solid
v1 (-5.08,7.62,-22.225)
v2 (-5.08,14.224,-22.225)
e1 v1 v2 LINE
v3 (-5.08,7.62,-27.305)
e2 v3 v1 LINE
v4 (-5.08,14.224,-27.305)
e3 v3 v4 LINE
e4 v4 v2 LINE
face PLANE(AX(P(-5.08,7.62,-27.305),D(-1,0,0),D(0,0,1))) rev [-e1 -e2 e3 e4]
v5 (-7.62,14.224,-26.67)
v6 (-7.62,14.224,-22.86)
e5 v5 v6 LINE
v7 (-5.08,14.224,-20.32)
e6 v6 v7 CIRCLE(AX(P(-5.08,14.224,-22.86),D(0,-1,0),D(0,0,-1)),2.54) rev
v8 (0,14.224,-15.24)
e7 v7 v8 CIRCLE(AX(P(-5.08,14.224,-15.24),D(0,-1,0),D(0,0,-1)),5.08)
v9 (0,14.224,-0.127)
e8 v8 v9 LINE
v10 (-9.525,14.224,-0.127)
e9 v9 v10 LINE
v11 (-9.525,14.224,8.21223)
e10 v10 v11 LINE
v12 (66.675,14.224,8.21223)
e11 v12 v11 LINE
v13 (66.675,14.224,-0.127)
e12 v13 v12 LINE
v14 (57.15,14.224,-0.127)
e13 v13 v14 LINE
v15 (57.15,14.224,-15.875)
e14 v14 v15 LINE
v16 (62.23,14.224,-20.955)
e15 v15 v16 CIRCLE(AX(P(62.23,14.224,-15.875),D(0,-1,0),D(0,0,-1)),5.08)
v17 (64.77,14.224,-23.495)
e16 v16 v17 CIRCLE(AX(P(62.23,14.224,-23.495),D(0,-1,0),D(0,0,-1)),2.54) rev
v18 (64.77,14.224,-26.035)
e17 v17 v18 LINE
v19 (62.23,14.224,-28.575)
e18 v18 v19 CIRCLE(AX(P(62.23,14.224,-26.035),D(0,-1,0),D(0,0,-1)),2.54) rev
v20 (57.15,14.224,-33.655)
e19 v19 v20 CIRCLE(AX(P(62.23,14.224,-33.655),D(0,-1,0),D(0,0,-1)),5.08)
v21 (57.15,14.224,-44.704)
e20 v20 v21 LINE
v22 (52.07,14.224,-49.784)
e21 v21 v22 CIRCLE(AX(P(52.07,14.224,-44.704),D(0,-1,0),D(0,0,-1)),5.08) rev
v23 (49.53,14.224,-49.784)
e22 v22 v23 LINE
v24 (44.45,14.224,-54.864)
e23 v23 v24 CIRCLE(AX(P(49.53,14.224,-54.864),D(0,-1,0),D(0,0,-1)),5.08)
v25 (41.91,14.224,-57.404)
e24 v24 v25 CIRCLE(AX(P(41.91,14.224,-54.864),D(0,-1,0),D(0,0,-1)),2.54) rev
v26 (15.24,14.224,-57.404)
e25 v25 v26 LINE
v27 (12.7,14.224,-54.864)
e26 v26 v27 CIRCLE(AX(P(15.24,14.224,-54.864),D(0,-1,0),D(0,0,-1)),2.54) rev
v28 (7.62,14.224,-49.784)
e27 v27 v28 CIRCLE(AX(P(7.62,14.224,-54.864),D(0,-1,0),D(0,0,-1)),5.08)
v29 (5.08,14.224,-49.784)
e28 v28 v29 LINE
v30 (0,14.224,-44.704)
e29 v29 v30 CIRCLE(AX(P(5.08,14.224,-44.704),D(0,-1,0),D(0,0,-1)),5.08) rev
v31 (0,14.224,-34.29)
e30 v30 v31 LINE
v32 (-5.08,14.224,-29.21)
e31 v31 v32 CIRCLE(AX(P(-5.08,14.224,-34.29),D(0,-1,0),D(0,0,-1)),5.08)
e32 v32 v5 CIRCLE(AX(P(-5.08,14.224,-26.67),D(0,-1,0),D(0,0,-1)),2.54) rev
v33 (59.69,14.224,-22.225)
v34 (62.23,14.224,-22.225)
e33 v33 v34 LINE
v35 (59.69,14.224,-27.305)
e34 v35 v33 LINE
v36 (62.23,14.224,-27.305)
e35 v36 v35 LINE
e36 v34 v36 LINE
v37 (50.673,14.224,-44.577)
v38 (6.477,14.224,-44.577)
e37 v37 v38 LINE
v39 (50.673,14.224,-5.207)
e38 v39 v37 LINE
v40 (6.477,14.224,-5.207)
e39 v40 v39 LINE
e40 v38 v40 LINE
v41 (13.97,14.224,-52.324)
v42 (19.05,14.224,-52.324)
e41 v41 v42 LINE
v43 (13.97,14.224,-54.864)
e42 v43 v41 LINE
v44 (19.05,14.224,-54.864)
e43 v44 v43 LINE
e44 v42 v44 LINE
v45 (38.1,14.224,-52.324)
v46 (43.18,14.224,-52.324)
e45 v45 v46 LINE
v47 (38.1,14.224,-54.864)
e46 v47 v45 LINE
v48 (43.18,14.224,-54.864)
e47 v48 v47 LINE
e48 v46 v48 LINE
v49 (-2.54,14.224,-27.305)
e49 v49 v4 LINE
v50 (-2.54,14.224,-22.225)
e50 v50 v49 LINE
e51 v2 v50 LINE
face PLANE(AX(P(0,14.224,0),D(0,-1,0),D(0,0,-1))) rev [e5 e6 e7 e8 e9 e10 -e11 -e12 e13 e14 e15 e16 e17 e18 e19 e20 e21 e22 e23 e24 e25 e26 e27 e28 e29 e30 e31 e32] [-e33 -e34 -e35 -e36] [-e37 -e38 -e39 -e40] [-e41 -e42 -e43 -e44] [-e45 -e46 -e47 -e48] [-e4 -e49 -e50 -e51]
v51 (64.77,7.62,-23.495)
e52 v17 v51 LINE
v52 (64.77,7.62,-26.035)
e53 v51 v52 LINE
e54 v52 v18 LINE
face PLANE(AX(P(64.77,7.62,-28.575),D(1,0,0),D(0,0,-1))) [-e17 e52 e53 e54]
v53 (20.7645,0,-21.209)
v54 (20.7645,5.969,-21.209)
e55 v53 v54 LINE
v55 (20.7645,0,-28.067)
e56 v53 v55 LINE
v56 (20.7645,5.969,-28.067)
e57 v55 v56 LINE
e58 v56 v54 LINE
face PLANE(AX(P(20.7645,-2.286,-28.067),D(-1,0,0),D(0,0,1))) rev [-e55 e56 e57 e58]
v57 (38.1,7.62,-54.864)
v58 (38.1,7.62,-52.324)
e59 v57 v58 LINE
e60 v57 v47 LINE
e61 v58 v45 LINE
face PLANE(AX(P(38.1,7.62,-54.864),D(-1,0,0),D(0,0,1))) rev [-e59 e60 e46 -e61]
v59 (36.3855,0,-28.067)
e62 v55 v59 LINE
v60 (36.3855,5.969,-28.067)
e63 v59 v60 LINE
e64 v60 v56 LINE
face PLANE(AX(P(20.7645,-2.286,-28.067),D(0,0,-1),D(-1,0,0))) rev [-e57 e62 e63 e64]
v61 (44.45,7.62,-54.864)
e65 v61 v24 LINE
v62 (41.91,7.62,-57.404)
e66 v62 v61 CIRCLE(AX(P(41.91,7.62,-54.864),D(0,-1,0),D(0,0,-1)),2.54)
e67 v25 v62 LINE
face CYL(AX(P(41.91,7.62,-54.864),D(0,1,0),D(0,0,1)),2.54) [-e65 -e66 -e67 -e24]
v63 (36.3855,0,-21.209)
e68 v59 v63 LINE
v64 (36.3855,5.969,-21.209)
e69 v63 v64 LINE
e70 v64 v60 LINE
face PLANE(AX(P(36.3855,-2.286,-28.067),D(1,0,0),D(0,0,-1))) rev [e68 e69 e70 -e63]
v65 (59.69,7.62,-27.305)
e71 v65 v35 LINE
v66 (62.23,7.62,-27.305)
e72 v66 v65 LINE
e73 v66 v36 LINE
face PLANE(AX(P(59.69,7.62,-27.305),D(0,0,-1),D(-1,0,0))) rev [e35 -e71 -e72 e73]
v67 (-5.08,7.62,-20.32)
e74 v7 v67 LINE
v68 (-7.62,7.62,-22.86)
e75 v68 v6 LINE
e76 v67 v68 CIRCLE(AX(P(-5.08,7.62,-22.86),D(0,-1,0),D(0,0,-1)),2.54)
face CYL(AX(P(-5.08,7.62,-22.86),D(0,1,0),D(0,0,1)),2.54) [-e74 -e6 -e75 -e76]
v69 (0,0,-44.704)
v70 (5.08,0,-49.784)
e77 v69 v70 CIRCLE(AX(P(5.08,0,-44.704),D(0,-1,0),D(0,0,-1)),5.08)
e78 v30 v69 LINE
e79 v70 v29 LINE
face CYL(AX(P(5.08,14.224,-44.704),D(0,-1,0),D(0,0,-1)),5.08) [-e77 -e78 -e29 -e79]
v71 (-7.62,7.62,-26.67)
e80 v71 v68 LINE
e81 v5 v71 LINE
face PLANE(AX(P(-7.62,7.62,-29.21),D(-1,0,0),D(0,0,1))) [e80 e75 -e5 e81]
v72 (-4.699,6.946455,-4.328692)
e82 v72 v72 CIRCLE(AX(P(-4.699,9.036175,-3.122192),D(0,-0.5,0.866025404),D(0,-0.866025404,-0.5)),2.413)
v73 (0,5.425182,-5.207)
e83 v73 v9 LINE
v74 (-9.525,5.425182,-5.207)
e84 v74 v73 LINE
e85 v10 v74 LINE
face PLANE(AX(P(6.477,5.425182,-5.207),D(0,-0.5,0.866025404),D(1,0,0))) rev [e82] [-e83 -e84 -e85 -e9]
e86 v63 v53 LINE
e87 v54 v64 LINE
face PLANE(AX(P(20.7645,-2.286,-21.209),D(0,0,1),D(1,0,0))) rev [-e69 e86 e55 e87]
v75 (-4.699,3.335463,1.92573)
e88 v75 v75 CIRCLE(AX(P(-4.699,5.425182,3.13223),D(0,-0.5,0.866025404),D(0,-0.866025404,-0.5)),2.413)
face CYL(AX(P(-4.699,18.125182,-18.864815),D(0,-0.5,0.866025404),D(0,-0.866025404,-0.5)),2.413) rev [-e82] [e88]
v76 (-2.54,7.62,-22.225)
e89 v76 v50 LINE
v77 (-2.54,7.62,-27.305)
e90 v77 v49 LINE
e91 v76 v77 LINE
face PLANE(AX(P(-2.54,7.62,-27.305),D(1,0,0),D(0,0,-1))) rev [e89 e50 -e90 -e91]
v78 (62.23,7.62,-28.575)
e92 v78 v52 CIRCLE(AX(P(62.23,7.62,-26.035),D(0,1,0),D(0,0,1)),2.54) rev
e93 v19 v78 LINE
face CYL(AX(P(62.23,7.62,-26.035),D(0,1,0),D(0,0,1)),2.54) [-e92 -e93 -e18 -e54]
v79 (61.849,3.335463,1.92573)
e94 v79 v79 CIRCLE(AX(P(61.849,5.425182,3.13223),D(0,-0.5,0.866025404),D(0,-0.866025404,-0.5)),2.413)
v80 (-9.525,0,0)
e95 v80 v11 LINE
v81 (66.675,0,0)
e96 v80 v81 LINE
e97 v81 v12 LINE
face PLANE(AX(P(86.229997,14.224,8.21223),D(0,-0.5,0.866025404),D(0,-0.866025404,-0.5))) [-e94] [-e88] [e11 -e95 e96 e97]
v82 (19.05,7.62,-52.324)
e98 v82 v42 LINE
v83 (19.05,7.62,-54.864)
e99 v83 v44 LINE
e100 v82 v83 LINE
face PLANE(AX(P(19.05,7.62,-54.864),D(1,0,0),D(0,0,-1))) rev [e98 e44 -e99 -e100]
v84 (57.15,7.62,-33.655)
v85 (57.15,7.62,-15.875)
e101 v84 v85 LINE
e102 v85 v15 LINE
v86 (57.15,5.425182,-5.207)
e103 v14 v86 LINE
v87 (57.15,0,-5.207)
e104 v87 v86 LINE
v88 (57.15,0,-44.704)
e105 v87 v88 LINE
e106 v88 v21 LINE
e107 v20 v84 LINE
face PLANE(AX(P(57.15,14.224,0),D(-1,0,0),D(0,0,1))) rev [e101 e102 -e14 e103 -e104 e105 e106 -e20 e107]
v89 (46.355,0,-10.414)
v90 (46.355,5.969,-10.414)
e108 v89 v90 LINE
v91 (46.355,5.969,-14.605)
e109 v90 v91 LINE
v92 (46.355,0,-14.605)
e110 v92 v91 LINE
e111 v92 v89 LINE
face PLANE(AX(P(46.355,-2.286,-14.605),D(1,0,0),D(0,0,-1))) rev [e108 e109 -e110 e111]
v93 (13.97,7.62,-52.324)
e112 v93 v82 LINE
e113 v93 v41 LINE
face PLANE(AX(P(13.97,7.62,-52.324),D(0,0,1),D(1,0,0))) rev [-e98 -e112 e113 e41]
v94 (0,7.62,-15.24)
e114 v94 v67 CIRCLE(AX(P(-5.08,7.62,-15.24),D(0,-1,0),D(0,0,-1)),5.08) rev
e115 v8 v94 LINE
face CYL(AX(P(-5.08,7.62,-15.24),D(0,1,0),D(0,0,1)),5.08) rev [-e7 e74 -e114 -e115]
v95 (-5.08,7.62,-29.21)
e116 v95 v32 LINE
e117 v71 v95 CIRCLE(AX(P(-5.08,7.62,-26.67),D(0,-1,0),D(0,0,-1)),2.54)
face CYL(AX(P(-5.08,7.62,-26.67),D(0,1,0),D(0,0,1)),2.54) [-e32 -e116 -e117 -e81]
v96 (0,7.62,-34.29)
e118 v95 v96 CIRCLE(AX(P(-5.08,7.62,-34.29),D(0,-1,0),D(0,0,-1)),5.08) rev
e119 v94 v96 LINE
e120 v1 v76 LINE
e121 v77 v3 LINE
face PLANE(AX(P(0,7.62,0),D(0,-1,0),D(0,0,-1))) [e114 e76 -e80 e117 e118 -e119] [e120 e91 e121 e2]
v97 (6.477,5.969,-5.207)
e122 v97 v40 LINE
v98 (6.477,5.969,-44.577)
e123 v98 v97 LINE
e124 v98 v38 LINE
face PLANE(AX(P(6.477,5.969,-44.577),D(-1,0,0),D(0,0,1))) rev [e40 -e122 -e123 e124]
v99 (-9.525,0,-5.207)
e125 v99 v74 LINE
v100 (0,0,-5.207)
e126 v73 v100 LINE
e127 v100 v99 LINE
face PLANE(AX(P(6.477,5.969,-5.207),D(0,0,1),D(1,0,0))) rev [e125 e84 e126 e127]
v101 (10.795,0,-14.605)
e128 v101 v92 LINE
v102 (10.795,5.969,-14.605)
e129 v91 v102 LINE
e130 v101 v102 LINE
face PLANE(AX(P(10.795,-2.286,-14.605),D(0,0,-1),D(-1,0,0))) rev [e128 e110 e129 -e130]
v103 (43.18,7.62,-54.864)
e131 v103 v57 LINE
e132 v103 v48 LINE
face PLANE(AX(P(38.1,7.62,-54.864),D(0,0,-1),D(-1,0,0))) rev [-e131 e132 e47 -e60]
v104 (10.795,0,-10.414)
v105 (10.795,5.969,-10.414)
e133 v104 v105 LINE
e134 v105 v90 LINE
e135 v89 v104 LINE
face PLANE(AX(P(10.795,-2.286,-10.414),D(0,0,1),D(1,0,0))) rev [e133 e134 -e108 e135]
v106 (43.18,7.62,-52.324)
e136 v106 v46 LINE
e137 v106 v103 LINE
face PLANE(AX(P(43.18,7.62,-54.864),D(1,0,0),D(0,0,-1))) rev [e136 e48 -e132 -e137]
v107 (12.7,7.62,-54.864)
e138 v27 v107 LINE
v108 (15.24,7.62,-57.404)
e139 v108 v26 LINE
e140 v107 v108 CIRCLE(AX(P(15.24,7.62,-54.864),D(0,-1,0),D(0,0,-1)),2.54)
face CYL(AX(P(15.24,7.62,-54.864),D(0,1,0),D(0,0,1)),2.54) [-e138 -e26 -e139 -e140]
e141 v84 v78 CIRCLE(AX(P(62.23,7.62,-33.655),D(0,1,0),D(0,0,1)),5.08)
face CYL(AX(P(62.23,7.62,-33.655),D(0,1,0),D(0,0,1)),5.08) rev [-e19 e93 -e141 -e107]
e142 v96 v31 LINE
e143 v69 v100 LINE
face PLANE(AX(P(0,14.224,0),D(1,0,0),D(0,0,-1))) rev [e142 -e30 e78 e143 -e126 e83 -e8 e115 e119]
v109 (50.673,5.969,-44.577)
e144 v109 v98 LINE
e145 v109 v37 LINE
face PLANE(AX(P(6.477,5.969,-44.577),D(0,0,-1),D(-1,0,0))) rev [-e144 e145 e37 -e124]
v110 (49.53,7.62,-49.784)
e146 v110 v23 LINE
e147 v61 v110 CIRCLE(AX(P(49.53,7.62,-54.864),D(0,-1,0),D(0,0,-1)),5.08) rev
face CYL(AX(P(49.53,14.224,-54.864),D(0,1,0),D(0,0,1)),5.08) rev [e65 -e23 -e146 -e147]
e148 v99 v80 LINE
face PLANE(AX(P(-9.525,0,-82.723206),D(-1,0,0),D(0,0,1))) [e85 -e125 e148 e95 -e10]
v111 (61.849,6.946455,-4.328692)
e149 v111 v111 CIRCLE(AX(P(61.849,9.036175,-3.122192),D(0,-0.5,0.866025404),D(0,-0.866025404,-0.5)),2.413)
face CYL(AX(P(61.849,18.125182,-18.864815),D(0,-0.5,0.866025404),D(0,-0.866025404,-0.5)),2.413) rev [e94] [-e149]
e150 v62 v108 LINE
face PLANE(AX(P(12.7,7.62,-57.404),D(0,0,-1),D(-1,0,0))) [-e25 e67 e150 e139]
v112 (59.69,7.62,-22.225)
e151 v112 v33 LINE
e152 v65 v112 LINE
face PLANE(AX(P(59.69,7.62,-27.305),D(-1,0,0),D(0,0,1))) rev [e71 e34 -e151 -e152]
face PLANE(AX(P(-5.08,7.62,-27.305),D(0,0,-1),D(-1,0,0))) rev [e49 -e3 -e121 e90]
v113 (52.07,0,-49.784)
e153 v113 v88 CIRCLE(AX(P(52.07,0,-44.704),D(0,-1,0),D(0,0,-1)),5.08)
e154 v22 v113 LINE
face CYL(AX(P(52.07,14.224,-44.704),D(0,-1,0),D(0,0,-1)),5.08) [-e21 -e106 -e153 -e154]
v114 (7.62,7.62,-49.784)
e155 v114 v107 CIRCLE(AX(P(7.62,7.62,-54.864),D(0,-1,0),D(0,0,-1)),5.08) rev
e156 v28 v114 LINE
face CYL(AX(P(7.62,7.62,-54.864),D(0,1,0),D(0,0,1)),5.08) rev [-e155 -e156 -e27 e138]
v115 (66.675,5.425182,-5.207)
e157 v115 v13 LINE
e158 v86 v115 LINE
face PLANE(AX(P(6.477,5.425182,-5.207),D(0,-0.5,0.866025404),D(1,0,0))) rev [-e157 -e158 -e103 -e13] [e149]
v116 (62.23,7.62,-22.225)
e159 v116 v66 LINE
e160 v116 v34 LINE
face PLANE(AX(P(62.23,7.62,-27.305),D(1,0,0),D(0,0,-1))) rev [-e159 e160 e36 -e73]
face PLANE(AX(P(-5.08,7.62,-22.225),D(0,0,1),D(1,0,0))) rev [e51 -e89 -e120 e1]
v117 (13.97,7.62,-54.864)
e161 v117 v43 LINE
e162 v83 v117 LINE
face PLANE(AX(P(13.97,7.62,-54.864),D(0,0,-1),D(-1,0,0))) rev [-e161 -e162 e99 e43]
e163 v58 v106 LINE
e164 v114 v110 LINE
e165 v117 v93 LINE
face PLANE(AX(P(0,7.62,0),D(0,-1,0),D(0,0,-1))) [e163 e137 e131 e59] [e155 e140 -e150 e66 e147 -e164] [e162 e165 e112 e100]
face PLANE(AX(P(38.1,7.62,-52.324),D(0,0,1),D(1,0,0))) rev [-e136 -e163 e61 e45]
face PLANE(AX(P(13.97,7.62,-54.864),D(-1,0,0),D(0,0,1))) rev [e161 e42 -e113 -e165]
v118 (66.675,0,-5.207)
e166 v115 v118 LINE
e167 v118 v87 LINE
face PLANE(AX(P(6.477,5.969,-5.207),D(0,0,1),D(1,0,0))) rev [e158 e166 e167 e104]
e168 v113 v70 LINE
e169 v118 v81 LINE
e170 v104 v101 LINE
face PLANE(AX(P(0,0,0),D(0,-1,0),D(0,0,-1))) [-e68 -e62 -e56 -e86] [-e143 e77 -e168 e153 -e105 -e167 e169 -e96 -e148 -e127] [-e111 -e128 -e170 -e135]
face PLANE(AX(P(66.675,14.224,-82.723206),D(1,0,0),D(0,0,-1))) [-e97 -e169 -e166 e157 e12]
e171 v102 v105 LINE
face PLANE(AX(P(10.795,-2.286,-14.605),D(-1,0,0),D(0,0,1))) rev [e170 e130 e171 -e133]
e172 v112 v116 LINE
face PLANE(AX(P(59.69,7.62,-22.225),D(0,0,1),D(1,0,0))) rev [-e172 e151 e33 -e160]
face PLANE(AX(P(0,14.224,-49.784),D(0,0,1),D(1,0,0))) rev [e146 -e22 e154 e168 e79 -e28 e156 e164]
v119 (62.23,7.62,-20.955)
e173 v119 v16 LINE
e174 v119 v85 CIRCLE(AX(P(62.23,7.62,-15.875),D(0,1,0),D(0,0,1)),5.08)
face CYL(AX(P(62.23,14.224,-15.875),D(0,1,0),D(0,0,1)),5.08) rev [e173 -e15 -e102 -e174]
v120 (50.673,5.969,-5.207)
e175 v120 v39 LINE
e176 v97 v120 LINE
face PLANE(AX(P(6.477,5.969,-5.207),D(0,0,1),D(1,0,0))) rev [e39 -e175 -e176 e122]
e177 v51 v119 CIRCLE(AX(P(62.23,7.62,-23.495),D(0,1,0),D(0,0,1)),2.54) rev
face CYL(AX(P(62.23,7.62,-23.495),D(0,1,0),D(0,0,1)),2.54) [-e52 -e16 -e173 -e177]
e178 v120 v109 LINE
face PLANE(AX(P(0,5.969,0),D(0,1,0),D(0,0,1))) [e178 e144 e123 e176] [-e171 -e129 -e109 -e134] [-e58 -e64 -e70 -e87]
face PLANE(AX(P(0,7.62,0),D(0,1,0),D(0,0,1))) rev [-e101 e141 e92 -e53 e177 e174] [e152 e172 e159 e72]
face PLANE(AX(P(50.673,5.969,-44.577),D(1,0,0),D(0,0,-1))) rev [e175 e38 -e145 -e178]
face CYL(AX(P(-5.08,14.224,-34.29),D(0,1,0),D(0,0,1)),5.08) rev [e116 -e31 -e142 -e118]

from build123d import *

# Parameters (mm, degrees)
SKETCH2_W           = 57.15
SKETCH2_H           = 49.784
BOSS_EXTRUDE1_DEPTH = 14.224
SKETCH3_W           = 44.196
SKETCH3_H           = 39.37
CUT_EXTRUDE1_DEPTH  = 8.255
SKETCH4_W           = 35.56
SKETCH4_H           = 4.191
SKETCH4_W_2         = 15.621
SKETCH4_H_2         = 6.858
CUT_EXTRUDE2_DEPTH  = 8.255
SKETCH5_W           = 7.62
SKETCH5_H           = 8.89
SKETCH5_H_2         = 7.62
BOSS_EXTRUDE2_DEPTH = 6.604
SKETCH6_W           = 2.54
SKETCH6_H           = 5.08
SKETCH6_W_2         = 5.08
SKETCH6_H_2         = 2.54
CUT_EXTRUDE3_DEPTH  = 6.604
FILLET1_R           = 5.08
FILLET2_R           = 2.54
SKETCH7_W           = 76.2
SKETCH7_H           = 14.224
SKETCH7_R           = 2.38125
BOSS_EXTRUDE3_DEPTH = 5.207
BOSS_EXTRUDE4_DEPTH = 76.2
SKETCH9_R           = 2.413
CUT_EXTRUDE4_DEPTH  = 25.4
CHAMFER1_SIZE       = 5.08
CHAMFER1_SIZE_2     = 8.798818102
CHAMFER2_SIZE       = 5.08
CHAMFER2_SIZE_2     = 8.798818102
FILLET3_R           = 5.08
FILLET4_R           = 5.08


# Some blends are built 0.0001 mm under size
with BuildPart() as part:
    # Sketch2 → Boss-Extrude1 (new body)
    with BuildSketch(Plane(origin=(0, 0, 0), x_dir=(1, 0, 0), z_dir=(0, 1, 0))):
        with Locations((28.575, 24.892)):
            Rectangle(SKETCH2_W, SKETCH2_H)
    extrude(amount=BOSS_EXTRUDE1_DEPTH)

    # Sketch3 → Cut-Extrude1 (cut)
    with BuildSketch(Plane(origin=(0, 14.224, 0), x_dir=(1, 0, 0), z_dir=(0, 1, 0))):
        with Locations((28.575, 24.892)):
            Rectangle(SKETCH3_W, SKETCH3_H)
    extrude(amount=-CUT_EXTRUDE1_DEPTH, mode=Mode.SUBTRACT)

    # Sketch4 → Cut-Extrude2 (cut)
    with BuildSketch(Plane(origin=(0, 5.969, 0), x_dir=(1, 0, 0), z_dir=(0, 1, 0))):
        with Locations((28.575, 12.5095)):
            Rectangle(SKETCH4_W, SKETCH4_H)
        with Locations((28.575, 24.638)):
            Rectangle(SKETCH4_W_2, SKETCH4_H_2)
    extrude(amount=-CUT_EXTRUDE2_DEPTH, mode=Mode.SUBTRACT)

    # Sketch5 → Boss-Extrude2 (add)
    with BuildSketch(Plane(origin=(0, 14.224, 0), x_dir=(1, 0, 0), z_dir=(0, 1, 0))):
        with Locations((-3.81, 24.765)):
            Rectangle(SKETCH5_W, SKETCH5_H)
        Polygon((12.7, 49.784), (36.83, 49.784), (44.45, 49.784), (44.45, 57.404), (36.83, 57.404), (12.7, 57.404), align=None)
        with Locations((60.96, 24.765)):
            Rectangle(SKETCH5_W, SKETCH5_H_2)
    extrude(amount=-BOSS_EXTRUDE2_DEPTH)

    # Sketch6 → Cut-Extrude3 (cut)
    with BuildSketch(Plane(origin=(0, 14.224, 0), x_dir=(1, 0, 0), z_dir=(0, 1, 0))):
        with Locations((-3.81, 24.765)):
            Rectangle(SKETCH6_W, SKETCH6_H)
        with Locations((60.96, 24.765)):
            Rectangle(SKETCH6_W, SKETCH6_H)
        with Locations((16.51, 53.594)):
            Rectangle(SKETCH6_W_2, SKETCH6_H_2)
        with Locations((40.64, 53.594)):
            Rectangle(SKETCH6_W_2, SKETCH6_H_2)
    extrude(amount=-CUT_EXTRUDE3_DEPTH, mode=Mode.SUBTRACT)

    # Fillet1
    fillet1_edges = [part.edges().sort_by_distance(p)[0] for p in [
        (0, 7.112, -49.784),
        (57.15, 7.112, -49.784),
        (57.15, 7.112, 0),
        (0, 7.112, 0),
    ]]
    fillet(fillet1_edges, radius=FILLET1_R)

    # Fillet2
    fillet2_edges = [part.edges().sort_by_distance(p)[0] for p in [
        (-7.62, 10.922, -20.32),
        (-7.62, 10.922, -29.21),
        (12.7, 10.922, -57.404),
        (44.45, 10.922, -57.404),
        (64.77, 10.922, -28.575),
        (64.77, 10.922, -20.955),
    ]]
    fillet(fillet2_edges, radius=FILLET2_R)

    # Sketch7 → Boss-Extrude3 (add)
    with BuildSketch(Plane.XY):
        with Locations((28.575, 7.112)):
            Rectangle(SKETCH7_W, SKETCH7_H)
        with Locations((-5.461, 7.112)):
            Circle(SKETCH7_R, mode=Mode.SUBTRACT)
        with Locations((62.611, 7.112)):
            Circle(SKETCH7_R, mode=Mode.SUBTRACT)
    extrude(amount=-BOSS_EXTRUDE3_DEPTH)

    # Sketch8 → Boss-Extrude4 (add)
    with BuildSketch(Plane.ZY.offset(9.525)):
        Polygon((-5.207, 0), (-5.207, 14.224), (8.212230229, 14.224), (0, 0), align=None)
    extrude(amount=-BOSS_EXTRUDE4_DEPTH)

    # Sketch9 → Cut-Extrude4 (cut)
    with BuildSketch(Plane(origin=(0, 0, 0), x_dir=(1, 0, 0), z_dir=(0, -0.5000000000000043, 0.8660254037844363))):
        with Locations(Location((-4.699, 6.264460458, 0), (0, 0, 270))):
            Circle(SKETCH9_R)
        with Locations(Location((61.849, 6.264460458, 0), (0, 0, 270))):
            Circle(SKETCH9_R)
    extrude(amount=-CUT_EXTRUDE4_DEPTH, mode=Mode.SUBTRACT)

    # Chamfer1
    # the kernel refuses this chamfer: 8.798818102, 5.08 mm, written as the material it takes off along each edge
    with BuildSketch(Plane(origin=(57.15, 14.224, -5.207), x_dir=(0, 0.05789386240267539, 0.9983227437537924), z_dir=(1, 0, 0))) as chamfer1_piece_1:
        Polygon((CHAMFER1_SIZE * 0.998322743754, CHAMFER1_SIZE * 0.0578938624027), (-CHAMFER1_SIZE_2 * 0.0578938624056, CHAMFER1_SIZE_2 * 0.998322743805), (0, 0), align=None)
    extrude(amount=32.288296971, mode=Mode.SUBTRACT)

    # Chamfer2
    # the kernel refuses this chamfer: 8.798818102, 5.08 mm, written as the material it takes off along each edge
    with BuildSketch(Plane(origin=(-32.288296971, 14.224, -5.207), x_dir=(0, 0.05789386240267139, 0.9983227437537925), z_dir=(1, 0, 0))) as chamfer2_piece_1:
        Polygon((CHAMFER2_SIZE * 0.998322743754, CHAMFER2_SIZE * 0.0578938624027), (-CHAMFER2_SIZE_2 * 0.0578938624056, CHAMFER2_SIZE_2 * 0.998322743805), (0, 0), align=None)
    extrude(amount=32.288296971, mode=Mode.SUBTRACT)

    # Fillet3
    fillet3_edges = [part.edges().sort_by_distance(p)[0] for p in [
        (44.45, 10.922, -49.784),
        (12.7, 10.922, -49.784),
    ]]
    fillet(fillet3_edges, radius=FILLET3_R - 0.0001)  # a hair under: the kernel refuses the full size

    # Fillet4
    fillet4_edges = [part.edges().sort_by_distance(p)[0] for p in [
        (57.15, 10.922, -20.955),
        (57.15, 10.922, -28.575),
        (0, 10.922, -29.21),
        (0, 10.922, -20.32),
    ]]
    fillet(fillet4_edges, radius=FILLET4_R - 0.0001)  # a hair under: the kernel refuses the full size


solid = part.part
